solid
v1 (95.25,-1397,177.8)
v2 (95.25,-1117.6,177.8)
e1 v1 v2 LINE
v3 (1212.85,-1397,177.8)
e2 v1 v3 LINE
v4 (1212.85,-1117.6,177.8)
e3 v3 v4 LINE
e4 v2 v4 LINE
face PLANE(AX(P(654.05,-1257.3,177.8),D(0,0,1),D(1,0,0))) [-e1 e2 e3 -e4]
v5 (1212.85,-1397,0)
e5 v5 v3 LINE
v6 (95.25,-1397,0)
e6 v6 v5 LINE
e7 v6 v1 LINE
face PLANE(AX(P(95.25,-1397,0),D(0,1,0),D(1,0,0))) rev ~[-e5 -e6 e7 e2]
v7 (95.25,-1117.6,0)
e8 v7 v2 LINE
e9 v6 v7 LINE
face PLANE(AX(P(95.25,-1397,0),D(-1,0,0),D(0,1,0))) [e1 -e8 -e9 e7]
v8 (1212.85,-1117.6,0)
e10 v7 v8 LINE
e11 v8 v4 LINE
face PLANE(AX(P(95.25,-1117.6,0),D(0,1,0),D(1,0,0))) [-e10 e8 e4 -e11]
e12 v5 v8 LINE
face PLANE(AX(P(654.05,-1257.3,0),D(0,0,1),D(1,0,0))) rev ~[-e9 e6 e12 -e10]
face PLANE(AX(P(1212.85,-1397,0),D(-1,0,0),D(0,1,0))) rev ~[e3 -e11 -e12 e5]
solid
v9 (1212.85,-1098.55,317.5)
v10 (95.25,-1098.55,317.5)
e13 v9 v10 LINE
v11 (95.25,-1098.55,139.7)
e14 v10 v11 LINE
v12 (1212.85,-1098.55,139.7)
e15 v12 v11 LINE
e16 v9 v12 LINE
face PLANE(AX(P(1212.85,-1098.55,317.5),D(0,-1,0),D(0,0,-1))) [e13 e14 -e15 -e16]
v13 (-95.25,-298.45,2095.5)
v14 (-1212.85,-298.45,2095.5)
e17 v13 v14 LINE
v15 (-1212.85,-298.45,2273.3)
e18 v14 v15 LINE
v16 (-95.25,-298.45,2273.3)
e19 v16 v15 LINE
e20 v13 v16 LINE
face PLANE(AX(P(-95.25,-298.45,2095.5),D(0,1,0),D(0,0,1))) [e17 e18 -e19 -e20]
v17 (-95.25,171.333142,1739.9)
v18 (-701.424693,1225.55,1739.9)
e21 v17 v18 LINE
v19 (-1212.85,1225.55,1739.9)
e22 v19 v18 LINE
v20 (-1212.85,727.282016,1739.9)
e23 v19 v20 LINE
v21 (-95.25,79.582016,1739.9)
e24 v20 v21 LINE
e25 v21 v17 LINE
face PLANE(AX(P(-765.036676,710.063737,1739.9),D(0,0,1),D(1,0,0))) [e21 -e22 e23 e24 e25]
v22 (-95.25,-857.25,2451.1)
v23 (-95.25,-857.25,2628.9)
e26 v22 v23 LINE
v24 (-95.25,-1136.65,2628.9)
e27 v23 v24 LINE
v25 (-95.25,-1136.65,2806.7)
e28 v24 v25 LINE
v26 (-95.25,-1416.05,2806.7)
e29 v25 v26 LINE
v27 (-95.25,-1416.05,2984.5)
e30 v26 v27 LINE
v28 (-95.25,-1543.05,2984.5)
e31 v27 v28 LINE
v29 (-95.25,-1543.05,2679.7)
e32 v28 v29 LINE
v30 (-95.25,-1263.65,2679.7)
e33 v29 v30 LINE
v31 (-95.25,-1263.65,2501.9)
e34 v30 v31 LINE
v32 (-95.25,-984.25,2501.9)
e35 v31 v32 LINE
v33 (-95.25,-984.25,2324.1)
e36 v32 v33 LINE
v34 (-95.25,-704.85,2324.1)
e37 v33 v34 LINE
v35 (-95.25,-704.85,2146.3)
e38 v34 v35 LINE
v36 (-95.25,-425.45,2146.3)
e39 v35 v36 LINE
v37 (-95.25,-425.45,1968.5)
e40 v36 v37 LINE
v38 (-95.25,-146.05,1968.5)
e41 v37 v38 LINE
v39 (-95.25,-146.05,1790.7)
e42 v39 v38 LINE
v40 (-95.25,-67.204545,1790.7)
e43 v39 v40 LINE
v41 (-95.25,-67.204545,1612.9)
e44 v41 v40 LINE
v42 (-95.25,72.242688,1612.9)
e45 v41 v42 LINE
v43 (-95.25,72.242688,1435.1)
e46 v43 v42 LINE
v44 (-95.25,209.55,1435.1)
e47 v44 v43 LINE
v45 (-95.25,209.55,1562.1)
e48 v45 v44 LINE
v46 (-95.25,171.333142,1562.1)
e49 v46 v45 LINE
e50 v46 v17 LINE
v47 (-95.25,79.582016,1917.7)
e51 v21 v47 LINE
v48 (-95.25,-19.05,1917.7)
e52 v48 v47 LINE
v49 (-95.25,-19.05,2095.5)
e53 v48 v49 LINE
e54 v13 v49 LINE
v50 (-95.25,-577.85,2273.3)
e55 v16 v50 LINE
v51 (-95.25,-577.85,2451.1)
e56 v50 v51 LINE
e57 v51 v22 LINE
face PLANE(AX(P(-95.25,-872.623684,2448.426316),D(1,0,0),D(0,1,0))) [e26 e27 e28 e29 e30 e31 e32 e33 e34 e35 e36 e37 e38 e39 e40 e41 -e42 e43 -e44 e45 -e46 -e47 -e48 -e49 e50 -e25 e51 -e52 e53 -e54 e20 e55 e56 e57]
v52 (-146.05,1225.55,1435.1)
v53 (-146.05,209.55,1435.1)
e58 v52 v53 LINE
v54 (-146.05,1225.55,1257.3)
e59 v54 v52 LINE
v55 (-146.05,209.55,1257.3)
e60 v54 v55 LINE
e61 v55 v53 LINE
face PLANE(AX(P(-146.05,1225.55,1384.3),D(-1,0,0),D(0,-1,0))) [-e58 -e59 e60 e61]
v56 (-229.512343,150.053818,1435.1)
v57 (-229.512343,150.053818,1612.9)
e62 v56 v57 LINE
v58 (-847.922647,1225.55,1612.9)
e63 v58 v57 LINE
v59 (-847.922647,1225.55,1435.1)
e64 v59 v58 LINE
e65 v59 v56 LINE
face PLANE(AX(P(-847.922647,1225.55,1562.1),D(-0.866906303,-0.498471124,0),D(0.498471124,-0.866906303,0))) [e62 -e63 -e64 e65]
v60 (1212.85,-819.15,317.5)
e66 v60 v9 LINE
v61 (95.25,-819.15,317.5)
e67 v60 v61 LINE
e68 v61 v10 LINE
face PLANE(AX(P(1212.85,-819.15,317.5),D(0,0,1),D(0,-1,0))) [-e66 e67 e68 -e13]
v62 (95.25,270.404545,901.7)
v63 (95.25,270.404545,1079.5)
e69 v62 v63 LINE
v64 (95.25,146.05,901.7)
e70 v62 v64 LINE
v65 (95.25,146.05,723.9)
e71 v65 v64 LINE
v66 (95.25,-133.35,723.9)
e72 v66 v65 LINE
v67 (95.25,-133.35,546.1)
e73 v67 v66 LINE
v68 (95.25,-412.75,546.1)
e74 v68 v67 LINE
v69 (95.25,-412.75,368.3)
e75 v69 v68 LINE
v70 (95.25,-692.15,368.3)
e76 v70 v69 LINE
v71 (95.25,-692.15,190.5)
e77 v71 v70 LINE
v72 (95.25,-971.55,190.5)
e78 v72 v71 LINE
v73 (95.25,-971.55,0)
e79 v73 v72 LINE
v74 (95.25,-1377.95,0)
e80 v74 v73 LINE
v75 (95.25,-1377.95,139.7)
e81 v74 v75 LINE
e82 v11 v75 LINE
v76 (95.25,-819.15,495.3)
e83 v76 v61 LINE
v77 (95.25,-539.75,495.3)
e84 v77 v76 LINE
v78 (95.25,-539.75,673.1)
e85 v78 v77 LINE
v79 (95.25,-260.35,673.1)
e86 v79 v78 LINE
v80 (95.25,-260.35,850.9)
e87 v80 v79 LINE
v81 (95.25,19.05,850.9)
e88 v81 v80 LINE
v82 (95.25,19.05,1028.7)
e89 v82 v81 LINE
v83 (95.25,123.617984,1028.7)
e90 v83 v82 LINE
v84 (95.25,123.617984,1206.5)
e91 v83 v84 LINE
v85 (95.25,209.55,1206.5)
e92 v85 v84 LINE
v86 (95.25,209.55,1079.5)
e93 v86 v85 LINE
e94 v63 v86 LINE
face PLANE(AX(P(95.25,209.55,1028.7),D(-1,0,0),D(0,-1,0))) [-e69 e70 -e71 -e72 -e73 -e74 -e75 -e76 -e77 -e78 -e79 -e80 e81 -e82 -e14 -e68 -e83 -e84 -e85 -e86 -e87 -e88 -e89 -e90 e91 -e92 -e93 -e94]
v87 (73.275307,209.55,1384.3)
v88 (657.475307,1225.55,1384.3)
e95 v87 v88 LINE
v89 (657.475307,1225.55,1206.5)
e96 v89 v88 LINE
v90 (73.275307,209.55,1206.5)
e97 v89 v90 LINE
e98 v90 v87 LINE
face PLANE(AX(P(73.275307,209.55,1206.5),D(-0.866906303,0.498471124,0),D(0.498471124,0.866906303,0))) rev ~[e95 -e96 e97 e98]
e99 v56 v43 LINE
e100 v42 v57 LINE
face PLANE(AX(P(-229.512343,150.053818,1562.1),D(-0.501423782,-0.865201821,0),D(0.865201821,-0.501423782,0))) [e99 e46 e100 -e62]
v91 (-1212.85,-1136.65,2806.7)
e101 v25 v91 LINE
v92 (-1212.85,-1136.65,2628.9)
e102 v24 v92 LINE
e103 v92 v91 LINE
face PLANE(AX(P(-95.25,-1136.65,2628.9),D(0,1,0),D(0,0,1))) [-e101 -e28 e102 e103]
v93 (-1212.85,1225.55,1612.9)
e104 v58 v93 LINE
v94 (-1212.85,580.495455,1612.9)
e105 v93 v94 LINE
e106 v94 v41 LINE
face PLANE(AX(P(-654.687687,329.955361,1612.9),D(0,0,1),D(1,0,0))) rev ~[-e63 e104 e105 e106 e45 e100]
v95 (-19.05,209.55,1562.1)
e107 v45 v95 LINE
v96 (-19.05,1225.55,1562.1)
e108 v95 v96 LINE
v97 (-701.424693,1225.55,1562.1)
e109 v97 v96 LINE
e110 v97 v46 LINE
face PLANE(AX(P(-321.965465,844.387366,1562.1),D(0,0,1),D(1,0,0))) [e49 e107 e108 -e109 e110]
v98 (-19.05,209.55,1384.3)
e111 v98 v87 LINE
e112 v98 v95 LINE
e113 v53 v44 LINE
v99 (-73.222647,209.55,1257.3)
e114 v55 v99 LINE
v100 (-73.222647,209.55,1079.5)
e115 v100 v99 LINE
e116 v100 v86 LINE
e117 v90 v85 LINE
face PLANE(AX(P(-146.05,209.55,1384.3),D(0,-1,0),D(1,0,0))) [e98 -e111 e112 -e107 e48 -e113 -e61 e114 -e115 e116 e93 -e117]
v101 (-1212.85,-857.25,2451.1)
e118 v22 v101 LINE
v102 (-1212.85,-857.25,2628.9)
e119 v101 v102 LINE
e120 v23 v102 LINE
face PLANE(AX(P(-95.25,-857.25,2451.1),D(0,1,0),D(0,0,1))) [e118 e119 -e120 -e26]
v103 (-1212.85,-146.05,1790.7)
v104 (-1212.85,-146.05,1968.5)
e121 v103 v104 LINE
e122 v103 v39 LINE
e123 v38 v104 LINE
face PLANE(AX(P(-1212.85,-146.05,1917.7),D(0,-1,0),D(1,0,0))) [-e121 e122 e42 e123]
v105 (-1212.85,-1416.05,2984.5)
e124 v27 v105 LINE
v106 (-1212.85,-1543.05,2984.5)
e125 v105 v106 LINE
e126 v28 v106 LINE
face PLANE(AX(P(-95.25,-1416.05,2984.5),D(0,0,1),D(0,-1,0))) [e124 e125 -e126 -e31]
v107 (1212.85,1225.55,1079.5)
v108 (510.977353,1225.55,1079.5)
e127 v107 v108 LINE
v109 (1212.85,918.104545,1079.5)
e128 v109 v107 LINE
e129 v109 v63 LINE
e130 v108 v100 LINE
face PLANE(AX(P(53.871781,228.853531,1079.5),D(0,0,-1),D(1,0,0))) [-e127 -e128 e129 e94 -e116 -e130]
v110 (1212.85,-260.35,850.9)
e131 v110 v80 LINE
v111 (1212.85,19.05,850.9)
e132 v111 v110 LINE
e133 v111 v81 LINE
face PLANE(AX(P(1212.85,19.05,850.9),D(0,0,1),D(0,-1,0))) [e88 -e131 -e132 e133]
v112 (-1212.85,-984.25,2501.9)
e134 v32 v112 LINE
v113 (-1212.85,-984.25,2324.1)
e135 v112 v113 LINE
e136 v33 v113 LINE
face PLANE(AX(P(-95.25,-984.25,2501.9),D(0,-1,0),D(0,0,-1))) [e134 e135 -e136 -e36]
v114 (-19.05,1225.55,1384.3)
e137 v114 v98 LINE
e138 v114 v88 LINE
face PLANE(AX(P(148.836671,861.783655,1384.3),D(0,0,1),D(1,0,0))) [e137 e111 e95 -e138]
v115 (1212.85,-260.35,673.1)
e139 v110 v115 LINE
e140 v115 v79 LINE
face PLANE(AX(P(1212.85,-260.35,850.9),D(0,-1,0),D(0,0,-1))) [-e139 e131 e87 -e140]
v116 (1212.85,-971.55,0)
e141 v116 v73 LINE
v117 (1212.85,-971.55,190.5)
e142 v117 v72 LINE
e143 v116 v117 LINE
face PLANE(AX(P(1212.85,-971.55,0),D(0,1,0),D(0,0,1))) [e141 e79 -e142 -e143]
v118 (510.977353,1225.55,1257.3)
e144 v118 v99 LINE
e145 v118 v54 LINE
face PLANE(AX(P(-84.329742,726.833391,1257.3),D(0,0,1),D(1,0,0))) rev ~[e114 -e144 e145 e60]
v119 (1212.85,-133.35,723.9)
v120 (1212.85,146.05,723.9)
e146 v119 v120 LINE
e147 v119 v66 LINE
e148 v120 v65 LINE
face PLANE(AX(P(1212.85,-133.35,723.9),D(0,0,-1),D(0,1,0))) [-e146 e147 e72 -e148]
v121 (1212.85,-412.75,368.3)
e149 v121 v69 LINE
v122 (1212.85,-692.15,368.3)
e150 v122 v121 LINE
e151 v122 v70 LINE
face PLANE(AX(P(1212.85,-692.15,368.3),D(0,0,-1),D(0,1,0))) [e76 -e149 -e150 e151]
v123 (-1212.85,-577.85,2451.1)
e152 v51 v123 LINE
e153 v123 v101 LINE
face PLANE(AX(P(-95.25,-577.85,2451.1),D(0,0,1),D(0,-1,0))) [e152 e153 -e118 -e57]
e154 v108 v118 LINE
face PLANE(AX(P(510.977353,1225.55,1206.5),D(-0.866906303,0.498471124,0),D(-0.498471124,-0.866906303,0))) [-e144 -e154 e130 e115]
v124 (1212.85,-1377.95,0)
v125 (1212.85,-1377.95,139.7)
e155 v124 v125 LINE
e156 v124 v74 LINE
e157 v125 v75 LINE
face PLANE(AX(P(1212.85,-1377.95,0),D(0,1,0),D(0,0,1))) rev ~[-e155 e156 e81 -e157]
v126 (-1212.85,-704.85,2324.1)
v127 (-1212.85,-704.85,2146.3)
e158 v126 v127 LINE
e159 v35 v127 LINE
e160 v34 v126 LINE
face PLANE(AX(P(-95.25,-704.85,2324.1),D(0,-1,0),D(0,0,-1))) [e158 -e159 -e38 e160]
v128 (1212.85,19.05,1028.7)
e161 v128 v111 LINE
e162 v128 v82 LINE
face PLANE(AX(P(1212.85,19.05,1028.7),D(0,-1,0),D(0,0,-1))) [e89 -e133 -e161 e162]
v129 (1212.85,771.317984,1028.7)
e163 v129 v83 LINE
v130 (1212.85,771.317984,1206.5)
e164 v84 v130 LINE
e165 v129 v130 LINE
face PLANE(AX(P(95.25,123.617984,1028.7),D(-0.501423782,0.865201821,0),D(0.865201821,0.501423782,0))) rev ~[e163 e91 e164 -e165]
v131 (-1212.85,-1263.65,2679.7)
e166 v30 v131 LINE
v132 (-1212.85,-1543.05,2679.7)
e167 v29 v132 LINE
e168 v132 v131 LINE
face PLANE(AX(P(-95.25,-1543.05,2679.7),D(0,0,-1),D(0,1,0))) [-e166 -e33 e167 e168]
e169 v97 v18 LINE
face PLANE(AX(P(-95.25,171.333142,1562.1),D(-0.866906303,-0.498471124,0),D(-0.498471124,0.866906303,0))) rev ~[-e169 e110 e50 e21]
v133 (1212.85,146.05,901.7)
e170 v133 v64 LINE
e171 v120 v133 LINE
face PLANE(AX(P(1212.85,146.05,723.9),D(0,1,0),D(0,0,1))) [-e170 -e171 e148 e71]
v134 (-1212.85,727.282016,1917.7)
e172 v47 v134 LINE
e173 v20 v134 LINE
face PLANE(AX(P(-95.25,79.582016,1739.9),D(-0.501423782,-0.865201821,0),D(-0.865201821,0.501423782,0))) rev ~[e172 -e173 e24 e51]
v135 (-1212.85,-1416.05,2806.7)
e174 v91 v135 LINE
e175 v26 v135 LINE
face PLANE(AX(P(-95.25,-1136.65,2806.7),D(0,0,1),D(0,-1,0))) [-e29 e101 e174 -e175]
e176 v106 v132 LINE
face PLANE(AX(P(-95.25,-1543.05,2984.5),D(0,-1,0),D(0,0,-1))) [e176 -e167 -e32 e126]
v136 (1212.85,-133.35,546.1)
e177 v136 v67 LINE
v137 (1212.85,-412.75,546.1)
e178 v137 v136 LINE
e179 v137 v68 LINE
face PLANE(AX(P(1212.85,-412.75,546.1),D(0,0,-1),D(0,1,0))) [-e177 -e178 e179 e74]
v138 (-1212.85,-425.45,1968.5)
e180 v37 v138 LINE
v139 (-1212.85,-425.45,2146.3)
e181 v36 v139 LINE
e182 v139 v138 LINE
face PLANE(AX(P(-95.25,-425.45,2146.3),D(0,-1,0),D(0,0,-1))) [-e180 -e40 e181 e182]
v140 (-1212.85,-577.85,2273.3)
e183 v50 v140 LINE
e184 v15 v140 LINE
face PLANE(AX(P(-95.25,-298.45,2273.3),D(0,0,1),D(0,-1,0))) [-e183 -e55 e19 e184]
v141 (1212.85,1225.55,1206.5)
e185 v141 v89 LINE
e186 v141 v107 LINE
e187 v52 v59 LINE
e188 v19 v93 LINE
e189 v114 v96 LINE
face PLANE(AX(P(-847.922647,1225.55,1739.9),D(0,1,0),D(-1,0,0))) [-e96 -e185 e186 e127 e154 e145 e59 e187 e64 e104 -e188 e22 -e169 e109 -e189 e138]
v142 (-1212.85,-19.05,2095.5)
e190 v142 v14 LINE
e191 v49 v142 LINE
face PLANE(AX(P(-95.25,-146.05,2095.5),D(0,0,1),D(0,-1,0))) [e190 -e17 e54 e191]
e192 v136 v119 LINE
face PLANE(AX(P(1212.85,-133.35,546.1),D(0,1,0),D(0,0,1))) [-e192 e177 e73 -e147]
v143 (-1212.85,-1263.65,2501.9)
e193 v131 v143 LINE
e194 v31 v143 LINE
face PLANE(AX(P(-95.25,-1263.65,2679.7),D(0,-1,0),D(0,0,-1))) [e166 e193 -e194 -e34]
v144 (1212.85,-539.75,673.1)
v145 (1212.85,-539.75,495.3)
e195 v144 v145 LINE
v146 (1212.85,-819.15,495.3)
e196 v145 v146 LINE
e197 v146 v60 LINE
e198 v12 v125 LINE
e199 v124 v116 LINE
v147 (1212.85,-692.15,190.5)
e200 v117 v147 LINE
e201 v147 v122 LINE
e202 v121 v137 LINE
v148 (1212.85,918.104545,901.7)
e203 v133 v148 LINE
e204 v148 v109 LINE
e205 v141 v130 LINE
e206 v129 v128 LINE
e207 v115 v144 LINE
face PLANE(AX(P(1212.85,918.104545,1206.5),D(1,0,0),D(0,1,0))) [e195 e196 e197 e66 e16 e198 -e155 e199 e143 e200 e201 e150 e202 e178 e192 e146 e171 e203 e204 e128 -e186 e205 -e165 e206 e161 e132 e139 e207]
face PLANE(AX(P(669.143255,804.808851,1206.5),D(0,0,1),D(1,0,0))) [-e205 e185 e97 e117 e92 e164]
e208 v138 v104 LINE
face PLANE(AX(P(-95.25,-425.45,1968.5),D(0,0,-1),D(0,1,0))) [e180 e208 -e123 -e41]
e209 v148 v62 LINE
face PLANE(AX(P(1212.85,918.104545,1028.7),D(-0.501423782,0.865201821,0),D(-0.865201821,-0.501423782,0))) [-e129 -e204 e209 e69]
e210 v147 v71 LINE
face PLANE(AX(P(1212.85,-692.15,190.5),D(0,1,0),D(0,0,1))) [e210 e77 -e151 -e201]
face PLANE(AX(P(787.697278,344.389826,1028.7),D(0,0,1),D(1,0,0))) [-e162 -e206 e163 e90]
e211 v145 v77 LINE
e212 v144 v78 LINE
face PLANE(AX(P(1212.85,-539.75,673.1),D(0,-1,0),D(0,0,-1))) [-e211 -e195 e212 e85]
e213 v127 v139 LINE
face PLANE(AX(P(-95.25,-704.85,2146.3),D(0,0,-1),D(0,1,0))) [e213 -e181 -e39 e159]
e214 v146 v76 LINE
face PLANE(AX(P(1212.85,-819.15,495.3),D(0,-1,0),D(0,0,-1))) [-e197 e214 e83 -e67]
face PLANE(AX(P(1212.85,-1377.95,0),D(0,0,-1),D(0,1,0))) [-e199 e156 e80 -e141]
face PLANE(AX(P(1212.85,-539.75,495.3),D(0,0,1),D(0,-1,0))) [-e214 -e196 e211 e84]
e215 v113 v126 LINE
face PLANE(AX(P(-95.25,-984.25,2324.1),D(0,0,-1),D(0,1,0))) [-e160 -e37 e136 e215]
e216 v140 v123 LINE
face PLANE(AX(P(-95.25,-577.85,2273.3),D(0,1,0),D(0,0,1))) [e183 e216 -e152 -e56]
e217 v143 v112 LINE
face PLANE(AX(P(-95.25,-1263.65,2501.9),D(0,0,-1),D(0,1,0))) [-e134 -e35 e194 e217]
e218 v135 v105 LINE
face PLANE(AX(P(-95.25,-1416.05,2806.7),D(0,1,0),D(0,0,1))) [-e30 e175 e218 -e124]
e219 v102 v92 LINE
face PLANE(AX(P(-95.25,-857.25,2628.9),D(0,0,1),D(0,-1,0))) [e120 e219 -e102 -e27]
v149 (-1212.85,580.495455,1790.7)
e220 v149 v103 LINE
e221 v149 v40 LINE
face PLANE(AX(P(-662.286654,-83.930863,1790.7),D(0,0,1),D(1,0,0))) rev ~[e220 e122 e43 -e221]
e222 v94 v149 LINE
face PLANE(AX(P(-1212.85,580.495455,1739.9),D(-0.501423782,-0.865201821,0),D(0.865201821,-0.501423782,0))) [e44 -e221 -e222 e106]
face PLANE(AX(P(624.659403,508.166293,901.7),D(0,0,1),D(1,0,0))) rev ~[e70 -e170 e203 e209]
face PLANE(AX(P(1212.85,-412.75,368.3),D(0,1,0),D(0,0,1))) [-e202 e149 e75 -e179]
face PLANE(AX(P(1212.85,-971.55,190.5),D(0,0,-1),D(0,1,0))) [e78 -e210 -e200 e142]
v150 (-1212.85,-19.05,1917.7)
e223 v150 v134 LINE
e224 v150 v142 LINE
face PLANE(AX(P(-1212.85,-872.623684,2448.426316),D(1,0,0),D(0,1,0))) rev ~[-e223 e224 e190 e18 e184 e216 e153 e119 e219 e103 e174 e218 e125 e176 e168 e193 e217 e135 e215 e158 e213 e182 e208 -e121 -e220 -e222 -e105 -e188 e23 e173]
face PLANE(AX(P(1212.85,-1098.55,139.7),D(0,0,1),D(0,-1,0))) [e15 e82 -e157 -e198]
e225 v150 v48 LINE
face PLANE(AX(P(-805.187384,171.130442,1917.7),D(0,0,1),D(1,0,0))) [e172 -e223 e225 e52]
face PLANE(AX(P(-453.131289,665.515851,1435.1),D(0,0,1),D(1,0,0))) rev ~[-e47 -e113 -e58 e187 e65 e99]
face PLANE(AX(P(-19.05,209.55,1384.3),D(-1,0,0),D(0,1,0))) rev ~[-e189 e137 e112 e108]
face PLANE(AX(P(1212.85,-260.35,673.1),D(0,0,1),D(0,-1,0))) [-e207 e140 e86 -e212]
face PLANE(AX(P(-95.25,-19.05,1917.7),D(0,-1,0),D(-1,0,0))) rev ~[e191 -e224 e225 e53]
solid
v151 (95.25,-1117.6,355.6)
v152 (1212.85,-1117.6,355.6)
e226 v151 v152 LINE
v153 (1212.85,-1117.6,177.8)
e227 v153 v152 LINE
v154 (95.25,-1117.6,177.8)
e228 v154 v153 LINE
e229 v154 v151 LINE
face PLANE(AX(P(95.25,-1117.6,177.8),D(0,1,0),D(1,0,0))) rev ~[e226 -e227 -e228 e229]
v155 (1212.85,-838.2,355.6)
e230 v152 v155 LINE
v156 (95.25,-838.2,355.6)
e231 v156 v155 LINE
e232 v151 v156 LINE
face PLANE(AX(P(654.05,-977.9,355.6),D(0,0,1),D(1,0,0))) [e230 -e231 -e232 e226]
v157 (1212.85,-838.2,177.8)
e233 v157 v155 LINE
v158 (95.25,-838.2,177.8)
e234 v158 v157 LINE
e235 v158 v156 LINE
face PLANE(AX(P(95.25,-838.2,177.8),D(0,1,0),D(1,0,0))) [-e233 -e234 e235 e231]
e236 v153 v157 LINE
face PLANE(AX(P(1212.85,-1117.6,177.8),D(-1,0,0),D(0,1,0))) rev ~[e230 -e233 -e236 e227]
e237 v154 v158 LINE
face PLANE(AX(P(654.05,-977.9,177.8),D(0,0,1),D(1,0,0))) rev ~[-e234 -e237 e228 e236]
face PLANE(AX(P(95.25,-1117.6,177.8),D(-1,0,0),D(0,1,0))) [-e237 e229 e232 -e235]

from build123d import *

# Parameters (mm, degrees)
F4_W           = 1117.6
F4_H           = 279.4
F6_DEPTH       = 177.8
F7_START       = 177.8
F7_DEPTH       = 177.8
F8_W           = 260.35
F8_H           = 139.7
F9_DEPTH       = 1117.6
F11_DEPTH      = 127
F12_DEPTH      = 177.8
F12_DEPTH_BACK = 127
F14_DEPTH      = 127
F15_DEPTH      = 177.8
F15_DEPTH_BACK = 127
F17_DEPTH      = 127
F18_DEPTH      = 177.8
F18_DEPTH_BACK = 127
F20_DEPTH      = 127
F21_DEPTH      = 177.8
F21_DEPTH_BACK = 127
F23_DEPTH      = 127
F24_DEPTH      = 177.8
F24_DEPTH_BACK = 127
F26_DEPTH      = 127
F27_DEPTH      = 177.8
F27_DEPTH_BACK = 127
F29_DEPTH      = 1117.6
F31_DEPTH      = 177.8


# Not quite as in the source:
# - a variable given as a bare number and used for a length is read in inches; the dataset says mm whatever the document's units were
# - a feature names something its author has since deleted; it is built from what else it names


with BuildPart() as f6:
    # F4 (on Top) → F6 (new body)
    with BuildSketch(Plane.XY):
        with Locations((654.05, -1257.3)):
            Rectangle(F4_W, F4_H)
    extrude(amount=F6_DEPTH)


with BuildPart() as f7:
    # F4 (on Top) → F7 (new body)
    with BuildSketch(Plane.XY.offset(F7_START)):
        with Locations((654.05, -977.9)):
            Rectangle(F4_W, F4_H)
    extrude(amount=F7_DEPTH)


with BuildPart() as f9:
    # F8 (on face) → F9 (new body)
    with BuildSketch(Plane.YZ.offset(1212.85)):
        Polygon((-1098.55, 139.7), (-1117.6, 139.7), (-1117.6, 0), (-971.55, 0), (-971.55, 190.5), (-692.15, 190.5), (-692.15, 368.3), (-412.75, 368.3), (-412.75, 546.1), (-133.35, 546.1), (-133.35, 723.9), (146.05, 723.9), (146.05, 1028.7), (19.05, 1028.7), (19.05, 850.9), (-260.35, 850.9), (-260.35, 673.1), (-539.75, 673.1), (-539.75, 495.3), (-819.15, 495.3), (-819.15, 317.5), (-1098.55, 317.5), align=None)
        with Locations((-1247.775, 69.85)):
            Rectangle(F8_W, F8_H)
    extrude(amount=-F9_DEPTH)

    # F10 (on face) → F11 (join)
    with BuildSketch(Plane.XY.offset(1028.7)):
        Polygon((1212.85, 771.3179841809), (133.9562233742, 146.05), (1212.85, 146.05), align=None)
    extrude(amount=-F11_DEPTH)

    # F10 (on face) → F12 (join, two sides)
    with BuildSketch(Plane.XY.offset(1028.7)) as f12_sk:
        Polygon((95.25, 146.05), (133.9562233742, 146.05), (1212.85, 771.3179841809), (1212.85, 918.1045453867), (-9.7539214515, 209.55), (95.25, 209.55), align=None)
        Polygon((95.25, 146.05), (95.25, 123.6179841809), (133.9562233742, 146.05), align=None)
    extrude(amount=F12_DEPTH)
    extrude(f12_sk.sketch, amount=-F12_DEPTH_BACK)

    # F13 (on face) → F14 (join)
    with BuildSketch(Plane.XY.offset(1206.5)):
        Polygon((1212.85, 1225.55), (657.4753068494, 1225.55), (114.7722326257, 281.7185665675), (1212.85, 918.1045453867), align=None)
    extrude(amount=-F14_DEPTH)

    # F13 (on face) → F15 (join, two sides)
    with BuildSketch(Plane.XY.offset(1206.5)) as f15_sk:
        Polygon((657.4753068494, 1225.55), (510.9773525122, 1225.55), (-73.2226474878, 209.55), (-9.7539214515, 209.55), (114.7722326257, 281.7185665675), align=None)
        Polygon((114.7722326257, 281.7185665675), (-9.7539214515, 209.55), (73.2753068494, 209.55), align=None)
    extrude(amount=F15_DEPTH)
    extrude(f15_sk.sketch, amount=-F15_DEPTH_BACK)

    # F16 (on face) → F17 (join)
    with BuildSketch(Plane.XY.offset(1384.3)):
        Polygon((510.9773525122, 1225.55), (-19.05, 1225.55), (-19.05, 303.7632999789), align=None)
    extrude(amount=-F17_DEPTH)

    # F16 (on face) → F18 (join, two sides)
    with BuildSketch(Plane.XY.offset(1384.3)) as f18_sk:
        Polygon((-19.05, 1225.55), (-146.05, 1225.55), (-146.05, 209.55), (-73.2226474878, 209.55), (-19.05, 303.7632999789), align=None)
        Polygon((-19.05, 303.7632999789), (-73.2226474878, 209.55), (-19.05, 209.55), align=None)
    extrude(amount=F18_DEPTH)
    extrude(f18_sk.sketch, amount=-F18_DEPTH_BACK)

    # F19 (on face) → F20 (join)
    with BuildSketch(Plane.XY.offset(1562.1)):
        Polygon((-146.05, 1225.55), (-701.4246931506, 1225.55), (-146.05, 259.6809684338), align=None)
        Polygon((-95.25, 209.55), (-117.2246931506, 209.55), (-95.25, 171.3331423468), align=None)
    extrude(amount=-F20_DEPTH)

    # F19 (on face) → F21 (join, two sides)
    with BuildSketch(Plane.XY.offset(1562.1)) as f21_sk:
        Polygon((-146.05, 259.6809684338), (-701.4246931506, 1225.55), (-847.9226474878, 1225.55), (-229.5123430682, 150.0538184006), (-95.25, 72.2426877588), (-95.25, 171.3331423468), (-117.2246931506, 209.55), (-146.05, 209.55), align=None)
        Polygon((-117.2246931506, 209.55), (-146.05, 259.6809684338), (-146.05, 209.55), align=None)
    extrude(amount=F21_DEPTH)
    extrude(f21_sk.sketch, amount=-F21_DEPTH_BACK)

    # F22 (on face) → F23 (join)
    with BuildSketch(Plane.XY.offset(1739.9)):
        Polygon((-235.841614476, 161.0612469359), (-847.9226474878, 1225.55), (-1212.85, 1225.55), (-1212.85, 727.2820158191), align=None)
    extrude(amount=-F23_DEPTH)

    # F22 (on face) → F24 (join, two sides)
    with BuildSketch(Plane.XY.offset(1739.9)) as f24_sk:
        Polygon((-229.5123430682, 150.0538184006), (-235.841614476, 161.0612469359), (-1212.85, 727.2820158191), (-1212.85, 580.4954546133), (-95.25, -67.2045453867), (-95.25, 72.2426877588), align=None)
        Polygon((-95.25, 79.5820158191), (-235.841614476, 161.0612469359), (-229.5123430682, 150.0538184006), (-95.25, 72.2426877588), align=None)
    extrude(amount=F24_DEPTH)
    extrude(f24_sk.sketch, amount=-F24_DEPTH_BACK)

    # F25 (on face) → F26 (join)
    with BuildSketch(Plane.XY.offset(1917.7)):
        Polygon((-178.3401959613, -19.05), (-1212.85, 580.4954546133), (-1212.85, -19.05), align=None)
    extrude(amount=-F26_DEPTH)

    # F25 (on face) → F27 (join, two sides)
    with BuildSketch(Plane.XY.offset(1917.7)) as f27_sk:
        Polygon((-178.3401959613, -19.05), (-1212.85, -19.05), (-1212.85, -146.05), (-95.25, -146.05), (-95.25, -67.2045453867), align=None)
        Polygon((-95.25, -19.05), (-178.3401959613, -19.05), (-95.25, -67.2045453867), align=None)
    extrude(amount=F27_DEPTH)
    extrude(f27_sk.sketch, amount=-F27_DEPTH_BACK)

    # F28 (on face) → F29 (join)
    with BuildSketch(Plane.YZ.offset(-95.25)):
        Polygon((-146.05, 1968.5), (-146.05, 2095.5), (-298.45, 2095.5), (-298.45, 2273.3), (-577.85, 2273.3), (-577.85, 2451.1), (-857.25, 2451.1), (-857.25, 2628.9), (-1136.65, 2628.9), (-1136.65, 2806.7), (-1416.05, 2806.7), (-1416.05, 2984.5), (-1543.05, 2984.5), (-1543.05, 2679.7), (-1263.65, 2679.7), (-1263.65, 2501.9), (-984.25, 2501.9), (-984.25, 2324.1), (-704.85, 2324.1), (-704.85, 2146.3), (-425.45, 2146.3), (-425.45, 1968.5), align=None)
    extrude(amount=-F29_DEPTH)

    # F30 (on face) → F31 (cut)
    with BuildSketch(Plane(origin=(0, 0, 901.7), x_dir=(1, 0, 0), z_dir=(0, 0, -1))):
        Polygon((95.25, -270.4045453867), (95.25, -209.55), (-9.7539214515, -209.55), align=None)
    extrude(amount=-F31_DEPTH, mode=Mode.SUBTRACT)


solid = Compound([f6.part, f7.part, f9.part])
